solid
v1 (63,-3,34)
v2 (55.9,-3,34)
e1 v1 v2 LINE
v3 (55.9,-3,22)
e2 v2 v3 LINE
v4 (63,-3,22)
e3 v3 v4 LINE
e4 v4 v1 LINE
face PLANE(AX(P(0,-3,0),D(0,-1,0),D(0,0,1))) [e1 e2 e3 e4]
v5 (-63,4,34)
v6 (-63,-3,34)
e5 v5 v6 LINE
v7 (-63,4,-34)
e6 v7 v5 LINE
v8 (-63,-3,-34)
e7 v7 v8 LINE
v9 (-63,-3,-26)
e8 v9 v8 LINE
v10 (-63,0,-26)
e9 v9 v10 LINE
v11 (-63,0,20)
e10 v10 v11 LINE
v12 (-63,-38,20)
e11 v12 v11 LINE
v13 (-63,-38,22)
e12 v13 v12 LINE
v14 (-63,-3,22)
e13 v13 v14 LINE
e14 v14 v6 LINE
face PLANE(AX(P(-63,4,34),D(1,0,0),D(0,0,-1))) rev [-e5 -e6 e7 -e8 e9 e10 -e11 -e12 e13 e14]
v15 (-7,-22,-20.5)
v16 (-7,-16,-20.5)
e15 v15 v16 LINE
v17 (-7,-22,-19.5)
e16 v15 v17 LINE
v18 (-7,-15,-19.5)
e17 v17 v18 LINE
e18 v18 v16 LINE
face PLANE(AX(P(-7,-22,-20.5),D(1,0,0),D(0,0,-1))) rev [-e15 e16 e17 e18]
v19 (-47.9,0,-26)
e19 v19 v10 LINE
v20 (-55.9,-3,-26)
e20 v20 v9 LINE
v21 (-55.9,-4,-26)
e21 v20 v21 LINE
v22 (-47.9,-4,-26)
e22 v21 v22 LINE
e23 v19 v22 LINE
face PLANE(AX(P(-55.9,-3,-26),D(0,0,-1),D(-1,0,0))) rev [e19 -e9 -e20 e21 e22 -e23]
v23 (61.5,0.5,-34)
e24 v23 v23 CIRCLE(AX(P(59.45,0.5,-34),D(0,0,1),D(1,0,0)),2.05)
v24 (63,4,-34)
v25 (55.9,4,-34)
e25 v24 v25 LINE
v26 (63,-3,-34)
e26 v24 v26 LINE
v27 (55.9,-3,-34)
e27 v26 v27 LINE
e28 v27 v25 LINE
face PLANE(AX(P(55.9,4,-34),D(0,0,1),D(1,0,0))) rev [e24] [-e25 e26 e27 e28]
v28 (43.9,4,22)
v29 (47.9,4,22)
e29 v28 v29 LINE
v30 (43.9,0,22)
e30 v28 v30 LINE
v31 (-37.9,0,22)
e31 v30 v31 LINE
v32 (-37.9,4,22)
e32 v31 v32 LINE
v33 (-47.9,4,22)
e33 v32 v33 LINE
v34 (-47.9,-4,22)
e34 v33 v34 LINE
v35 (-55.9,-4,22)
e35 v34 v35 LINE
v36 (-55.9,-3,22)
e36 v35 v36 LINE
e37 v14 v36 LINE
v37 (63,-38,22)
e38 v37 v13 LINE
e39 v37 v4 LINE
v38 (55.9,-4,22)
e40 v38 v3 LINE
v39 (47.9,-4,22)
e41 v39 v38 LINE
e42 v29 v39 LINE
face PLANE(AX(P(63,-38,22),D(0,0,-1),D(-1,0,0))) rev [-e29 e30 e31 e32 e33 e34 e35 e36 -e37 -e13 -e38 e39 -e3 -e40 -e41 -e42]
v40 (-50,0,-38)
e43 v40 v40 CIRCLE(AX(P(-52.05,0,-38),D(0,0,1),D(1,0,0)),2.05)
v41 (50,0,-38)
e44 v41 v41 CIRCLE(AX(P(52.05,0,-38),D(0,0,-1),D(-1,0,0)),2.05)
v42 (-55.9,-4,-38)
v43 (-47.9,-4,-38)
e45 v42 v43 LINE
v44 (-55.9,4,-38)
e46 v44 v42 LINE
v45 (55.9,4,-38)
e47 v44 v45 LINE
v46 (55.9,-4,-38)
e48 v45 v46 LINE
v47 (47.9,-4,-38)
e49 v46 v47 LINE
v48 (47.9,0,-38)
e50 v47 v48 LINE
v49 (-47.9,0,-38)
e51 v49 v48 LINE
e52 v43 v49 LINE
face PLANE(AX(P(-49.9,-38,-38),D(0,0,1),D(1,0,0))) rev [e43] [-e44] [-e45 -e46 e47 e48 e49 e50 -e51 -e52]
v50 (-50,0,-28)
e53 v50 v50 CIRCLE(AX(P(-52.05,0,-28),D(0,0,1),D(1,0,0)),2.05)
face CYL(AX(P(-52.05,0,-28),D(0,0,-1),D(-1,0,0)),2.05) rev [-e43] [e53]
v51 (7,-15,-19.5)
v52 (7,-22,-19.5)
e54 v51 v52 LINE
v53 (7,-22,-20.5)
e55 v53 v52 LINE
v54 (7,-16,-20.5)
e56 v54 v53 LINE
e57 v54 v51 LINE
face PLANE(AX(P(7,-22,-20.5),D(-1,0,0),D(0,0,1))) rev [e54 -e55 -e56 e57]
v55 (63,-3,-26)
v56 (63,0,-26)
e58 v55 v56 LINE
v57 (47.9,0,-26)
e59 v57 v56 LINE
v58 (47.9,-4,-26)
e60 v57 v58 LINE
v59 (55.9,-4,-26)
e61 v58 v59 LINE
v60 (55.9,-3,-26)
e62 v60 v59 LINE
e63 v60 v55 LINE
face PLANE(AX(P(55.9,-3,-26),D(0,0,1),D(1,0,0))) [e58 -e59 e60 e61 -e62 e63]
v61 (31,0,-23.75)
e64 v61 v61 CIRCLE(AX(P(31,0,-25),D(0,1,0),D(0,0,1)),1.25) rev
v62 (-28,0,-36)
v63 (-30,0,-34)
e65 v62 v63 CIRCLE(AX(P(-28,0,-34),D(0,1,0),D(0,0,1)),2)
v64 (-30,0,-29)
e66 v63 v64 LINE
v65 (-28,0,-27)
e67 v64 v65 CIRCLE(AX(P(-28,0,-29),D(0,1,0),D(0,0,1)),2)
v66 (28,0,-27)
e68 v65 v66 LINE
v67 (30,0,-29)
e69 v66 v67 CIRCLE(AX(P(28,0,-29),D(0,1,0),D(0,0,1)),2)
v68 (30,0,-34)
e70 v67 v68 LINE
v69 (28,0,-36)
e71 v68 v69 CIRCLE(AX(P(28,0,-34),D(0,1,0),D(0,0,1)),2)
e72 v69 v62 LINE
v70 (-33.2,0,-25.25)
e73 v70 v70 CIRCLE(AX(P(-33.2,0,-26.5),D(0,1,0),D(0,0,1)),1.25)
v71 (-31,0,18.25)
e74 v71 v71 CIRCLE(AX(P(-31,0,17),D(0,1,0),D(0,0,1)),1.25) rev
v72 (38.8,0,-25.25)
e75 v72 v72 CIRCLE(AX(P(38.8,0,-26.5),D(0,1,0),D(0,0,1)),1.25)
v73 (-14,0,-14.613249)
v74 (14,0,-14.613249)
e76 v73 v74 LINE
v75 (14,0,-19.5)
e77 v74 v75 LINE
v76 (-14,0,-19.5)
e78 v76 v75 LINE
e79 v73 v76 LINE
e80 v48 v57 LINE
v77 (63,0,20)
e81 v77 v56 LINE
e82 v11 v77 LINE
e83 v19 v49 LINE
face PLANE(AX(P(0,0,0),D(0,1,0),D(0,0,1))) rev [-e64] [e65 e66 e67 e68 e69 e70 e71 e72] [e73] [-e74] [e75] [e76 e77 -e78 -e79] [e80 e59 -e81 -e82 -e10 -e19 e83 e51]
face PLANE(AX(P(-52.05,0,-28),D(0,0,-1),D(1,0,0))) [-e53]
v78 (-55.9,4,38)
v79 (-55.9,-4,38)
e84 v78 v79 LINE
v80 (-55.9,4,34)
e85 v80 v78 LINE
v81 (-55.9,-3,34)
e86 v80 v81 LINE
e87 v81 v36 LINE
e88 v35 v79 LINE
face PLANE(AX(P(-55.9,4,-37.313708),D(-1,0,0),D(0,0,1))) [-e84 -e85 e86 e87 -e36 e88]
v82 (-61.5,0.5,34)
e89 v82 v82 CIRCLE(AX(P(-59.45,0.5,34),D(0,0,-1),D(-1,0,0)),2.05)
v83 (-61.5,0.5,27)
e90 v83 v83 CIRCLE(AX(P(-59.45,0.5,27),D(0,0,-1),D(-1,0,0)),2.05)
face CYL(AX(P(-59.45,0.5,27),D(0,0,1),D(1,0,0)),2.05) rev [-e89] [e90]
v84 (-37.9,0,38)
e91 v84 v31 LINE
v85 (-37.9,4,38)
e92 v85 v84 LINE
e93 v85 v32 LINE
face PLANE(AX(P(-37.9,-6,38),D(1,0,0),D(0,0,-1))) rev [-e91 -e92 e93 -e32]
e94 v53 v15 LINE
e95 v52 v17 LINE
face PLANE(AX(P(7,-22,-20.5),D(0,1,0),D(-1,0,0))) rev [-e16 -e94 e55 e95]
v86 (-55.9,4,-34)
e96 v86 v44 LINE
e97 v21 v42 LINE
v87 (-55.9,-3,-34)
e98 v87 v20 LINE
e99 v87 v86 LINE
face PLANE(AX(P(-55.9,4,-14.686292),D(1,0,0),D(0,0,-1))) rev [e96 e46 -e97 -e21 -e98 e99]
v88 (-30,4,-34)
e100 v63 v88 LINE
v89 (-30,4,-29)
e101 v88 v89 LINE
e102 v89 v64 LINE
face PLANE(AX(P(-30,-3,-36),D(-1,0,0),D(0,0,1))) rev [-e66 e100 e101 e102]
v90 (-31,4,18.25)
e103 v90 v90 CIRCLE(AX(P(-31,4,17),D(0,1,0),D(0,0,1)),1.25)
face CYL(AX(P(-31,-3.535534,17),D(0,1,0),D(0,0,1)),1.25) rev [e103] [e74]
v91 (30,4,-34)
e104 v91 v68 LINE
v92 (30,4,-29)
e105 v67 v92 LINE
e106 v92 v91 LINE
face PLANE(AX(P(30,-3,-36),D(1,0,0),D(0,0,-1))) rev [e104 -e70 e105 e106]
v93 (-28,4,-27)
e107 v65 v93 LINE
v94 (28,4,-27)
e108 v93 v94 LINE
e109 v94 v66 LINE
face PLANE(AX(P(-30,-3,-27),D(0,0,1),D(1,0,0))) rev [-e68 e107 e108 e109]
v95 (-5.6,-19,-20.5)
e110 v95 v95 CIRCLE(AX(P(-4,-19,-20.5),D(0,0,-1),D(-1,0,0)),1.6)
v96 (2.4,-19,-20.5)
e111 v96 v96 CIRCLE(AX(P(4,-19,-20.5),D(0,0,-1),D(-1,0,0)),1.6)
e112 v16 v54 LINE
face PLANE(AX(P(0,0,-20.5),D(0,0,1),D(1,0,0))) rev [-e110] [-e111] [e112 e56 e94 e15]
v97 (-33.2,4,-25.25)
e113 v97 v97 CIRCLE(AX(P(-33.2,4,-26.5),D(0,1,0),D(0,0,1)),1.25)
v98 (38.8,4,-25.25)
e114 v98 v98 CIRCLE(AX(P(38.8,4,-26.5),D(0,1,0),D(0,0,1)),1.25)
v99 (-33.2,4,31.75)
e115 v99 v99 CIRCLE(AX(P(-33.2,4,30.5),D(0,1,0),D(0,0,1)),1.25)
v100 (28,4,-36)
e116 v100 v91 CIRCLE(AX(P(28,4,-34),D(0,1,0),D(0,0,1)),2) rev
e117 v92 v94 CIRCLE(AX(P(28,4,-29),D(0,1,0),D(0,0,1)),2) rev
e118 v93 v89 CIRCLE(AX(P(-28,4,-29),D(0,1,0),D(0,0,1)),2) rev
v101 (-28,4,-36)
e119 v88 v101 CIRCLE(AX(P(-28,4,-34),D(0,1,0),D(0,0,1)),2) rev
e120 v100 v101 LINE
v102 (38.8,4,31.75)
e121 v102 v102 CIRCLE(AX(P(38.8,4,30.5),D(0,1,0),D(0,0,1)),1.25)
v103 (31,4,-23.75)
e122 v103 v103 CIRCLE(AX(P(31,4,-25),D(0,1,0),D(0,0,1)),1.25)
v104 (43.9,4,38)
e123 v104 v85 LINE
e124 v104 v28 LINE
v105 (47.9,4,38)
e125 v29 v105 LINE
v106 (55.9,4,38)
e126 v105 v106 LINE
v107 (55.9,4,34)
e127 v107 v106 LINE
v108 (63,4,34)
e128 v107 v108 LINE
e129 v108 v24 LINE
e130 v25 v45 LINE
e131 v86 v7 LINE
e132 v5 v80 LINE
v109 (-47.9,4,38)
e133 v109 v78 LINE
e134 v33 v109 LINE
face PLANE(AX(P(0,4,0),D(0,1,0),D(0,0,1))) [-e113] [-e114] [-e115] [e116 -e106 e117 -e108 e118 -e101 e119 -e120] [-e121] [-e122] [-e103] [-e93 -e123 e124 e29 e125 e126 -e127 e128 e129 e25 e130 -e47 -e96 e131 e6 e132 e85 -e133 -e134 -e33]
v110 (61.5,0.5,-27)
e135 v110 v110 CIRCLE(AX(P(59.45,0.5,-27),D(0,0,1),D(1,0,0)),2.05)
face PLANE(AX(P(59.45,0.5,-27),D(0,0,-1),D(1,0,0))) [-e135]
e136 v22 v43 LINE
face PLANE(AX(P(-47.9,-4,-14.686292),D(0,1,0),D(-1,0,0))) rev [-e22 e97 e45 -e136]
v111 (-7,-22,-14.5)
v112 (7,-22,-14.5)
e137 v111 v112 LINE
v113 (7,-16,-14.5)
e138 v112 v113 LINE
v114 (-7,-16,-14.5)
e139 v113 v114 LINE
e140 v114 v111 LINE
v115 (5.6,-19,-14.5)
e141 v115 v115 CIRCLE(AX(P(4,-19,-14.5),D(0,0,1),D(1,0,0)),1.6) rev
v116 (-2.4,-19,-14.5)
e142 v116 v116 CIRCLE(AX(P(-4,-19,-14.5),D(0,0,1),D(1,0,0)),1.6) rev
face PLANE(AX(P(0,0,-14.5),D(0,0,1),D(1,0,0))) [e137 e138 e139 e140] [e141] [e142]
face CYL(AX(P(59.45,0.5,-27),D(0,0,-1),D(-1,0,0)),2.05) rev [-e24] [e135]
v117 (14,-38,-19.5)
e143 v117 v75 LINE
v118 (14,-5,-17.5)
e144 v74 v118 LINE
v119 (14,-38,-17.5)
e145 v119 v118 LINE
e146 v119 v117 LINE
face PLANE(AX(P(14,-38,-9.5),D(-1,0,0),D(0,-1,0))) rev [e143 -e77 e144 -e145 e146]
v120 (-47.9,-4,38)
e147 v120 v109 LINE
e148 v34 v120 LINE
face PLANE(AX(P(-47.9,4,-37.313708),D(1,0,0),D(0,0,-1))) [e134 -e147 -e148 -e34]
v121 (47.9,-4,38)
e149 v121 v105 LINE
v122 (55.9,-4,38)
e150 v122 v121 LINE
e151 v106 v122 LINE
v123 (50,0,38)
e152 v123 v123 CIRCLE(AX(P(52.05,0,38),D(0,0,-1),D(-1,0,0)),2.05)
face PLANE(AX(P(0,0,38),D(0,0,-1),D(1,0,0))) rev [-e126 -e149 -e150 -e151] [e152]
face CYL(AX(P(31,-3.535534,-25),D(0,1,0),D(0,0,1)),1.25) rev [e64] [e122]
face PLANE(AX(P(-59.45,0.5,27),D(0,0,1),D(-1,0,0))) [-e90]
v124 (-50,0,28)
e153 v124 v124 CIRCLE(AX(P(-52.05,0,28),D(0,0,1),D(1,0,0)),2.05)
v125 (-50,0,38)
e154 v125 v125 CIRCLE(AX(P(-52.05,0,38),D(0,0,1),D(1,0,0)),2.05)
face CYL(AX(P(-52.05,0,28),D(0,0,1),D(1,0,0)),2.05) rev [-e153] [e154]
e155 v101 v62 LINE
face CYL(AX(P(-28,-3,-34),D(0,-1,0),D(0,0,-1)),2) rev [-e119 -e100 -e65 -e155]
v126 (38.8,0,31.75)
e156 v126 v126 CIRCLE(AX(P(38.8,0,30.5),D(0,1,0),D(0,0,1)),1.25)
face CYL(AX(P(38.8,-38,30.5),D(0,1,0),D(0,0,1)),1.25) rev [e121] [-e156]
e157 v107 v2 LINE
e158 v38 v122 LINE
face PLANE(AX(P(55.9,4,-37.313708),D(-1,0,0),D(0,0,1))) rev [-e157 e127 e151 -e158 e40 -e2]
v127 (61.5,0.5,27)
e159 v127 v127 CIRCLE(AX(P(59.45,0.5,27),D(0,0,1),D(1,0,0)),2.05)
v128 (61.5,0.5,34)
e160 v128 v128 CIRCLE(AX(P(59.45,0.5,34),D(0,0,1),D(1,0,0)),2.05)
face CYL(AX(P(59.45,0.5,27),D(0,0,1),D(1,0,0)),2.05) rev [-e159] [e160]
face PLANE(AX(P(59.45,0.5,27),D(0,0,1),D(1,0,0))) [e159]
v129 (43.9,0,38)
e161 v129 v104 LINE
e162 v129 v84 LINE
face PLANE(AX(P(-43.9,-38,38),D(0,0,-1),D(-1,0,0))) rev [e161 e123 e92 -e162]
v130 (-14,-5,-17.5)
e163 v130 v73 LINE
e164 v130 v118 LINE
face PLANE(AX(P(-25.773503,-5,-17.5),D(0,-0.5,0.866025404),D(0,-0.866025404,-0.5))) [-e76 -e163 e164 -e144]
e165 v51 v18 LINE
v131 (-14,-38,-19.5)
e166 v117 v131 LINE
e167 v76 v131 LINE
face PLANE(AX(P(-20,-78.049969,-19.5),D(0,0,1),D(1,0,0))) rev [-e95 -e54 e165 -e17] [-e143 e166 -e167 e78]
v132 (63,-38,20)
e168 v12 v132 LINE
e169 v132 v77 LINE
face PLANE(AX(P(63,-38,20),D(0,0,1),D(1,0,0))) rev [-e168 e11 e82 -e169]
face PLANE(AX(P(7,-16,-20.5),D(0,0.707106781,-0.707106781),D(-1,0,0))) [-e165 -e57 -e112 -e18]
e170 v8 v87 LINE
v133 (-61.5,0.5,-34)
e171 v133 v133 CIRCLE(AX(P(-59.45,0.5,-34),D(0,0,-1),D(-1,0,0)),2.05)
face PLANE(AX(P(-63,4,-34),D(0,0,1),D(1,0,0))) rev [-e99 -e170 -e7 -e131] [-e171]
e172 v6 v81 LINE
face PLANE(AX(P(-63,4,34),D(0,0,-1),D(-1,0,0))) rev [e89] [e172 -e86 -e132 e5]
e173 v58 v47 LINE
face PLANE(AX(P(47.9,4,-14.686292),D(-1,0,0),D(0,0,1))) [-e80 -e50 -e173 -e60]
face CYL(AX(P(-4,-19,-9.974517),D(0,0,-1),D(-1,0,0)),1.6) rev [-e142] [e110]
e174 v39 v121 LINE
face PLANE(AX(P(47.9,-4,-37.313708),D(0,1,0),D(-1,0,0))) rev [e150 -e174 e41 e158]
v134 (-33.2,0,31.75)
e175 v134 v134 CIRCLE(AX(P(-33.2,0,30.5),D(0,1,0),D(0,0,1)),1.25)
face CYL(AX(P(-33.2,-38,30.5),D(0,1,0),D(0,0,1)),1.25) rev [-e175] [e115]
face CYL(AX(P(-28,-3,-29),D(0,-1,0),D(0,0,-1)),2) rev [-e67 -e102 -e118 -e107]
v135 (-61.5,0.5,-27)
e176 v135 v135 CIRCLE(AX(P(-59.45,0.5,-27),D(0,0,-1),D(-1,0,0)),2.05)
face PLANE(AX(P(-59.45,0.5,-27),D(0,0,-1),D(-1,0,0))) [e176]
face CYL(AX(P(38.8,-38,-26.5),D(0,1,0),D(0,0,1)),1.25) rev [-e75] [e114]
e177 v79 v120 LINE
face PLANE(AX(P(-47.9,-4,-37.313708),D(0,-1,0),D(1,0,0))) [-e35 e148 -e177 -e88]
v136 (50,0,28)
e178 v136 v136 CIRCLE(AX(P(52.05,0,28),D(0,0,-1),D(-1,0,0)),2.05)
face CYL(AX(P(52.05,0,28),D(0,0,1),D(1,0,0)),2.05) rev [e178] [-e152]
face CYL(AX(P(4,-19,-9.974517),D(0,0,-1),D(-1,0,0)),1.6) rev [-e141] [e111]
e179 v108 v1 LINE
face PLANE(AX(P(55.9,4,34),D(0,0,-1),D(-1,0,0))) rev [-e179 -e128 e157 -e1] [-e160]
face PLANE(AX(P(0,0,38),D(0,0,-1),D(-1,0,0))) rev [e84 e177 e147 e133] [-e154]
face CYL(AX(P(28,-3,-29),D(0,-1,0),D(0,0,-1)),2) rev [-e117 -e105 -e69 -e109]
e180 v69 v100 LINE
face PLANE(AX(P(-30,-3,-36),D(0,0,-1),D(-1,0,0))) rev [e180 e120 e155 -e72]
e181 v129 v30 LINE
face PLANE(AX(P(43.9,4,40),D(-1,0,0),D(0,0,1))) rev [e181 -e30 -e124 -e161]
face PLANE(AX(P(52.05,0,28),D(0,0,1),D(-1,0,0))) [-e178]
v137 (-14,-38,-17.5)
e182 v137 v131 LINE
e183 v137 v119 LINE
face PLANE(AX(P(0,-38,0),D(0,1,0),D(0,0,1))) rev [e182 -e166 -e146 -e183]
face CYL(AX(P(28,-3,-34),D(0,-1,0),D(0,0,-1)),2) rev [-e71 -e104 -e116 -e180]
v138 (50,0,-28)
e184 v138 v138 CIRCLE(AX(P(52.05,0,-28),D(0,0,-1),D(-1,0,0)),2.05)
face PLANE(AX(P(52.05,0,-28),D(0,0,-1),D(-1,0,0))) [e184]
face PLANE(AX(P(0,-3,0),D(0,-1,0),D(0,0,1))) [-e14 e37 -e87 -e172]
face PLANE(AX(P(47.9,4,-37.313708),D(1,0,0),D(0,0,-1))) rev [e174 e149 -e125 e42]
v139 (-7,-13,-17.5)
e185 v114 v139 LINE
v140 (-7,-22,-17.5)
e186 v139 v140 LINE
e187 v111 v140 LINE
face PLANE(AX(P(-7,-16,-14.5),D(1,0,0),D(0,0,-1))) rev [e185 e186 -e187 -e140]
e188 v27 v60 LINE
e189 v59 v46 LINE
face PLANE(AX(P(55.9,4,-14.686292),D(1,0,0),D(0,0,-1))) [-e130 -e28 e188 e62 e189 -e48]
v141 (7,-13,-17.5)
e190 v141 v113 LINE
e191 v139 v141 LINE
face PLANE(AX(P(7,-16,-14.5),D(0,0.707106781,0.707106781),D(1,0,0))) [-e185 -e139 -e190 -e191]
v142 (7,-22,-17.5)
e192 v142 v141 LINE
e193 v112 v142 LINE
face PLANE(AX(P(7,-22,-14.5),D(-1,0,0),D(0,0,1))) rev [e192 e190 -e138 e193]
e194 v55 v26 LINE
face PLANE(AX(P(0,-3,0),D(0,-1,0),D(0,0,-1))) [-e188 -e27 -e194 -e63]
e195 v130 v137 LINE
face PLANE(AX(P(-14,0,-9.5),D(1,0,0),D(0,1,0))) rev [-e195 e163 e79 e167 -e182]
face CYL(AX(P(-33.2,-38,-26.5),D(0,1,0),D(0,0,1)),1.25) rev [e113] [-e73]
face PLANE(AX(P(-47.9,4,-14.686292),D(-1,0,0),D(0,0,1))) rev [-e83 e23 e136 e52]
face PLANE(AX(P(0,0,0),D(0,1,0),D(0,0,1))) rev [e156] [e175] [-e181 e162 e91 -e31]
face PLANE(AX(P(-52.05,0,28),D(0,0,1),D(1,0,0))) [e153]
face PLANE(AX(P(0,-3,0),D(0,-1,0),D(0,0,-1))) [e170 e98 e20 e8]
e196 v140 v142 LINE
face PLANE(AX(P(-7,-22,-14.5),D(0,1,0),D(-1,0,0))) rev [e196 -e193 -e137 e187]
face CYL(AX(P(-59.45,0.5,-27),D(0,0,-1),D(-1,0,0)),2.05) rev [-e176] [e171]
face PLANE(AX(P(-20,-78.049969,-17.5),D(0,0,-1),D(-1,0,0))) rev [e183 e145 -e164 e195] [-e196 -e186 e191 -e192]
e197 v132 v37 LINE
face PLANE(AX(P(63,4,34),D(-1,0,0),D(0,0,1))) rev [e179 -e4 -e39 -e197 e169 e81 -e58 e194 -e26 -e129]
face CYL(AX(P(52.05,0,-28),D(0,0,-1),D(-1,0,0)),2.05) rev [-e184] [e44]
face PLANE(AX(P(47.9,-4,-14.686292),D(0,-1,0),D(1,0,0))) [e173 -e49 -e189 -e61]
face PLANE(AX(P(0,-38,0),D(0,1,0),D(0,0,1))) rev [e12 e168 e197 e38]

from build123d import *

# Parameters (mm, degrees)
BOSS_EXTRUDE1_DEPTH             = 4
SKETCH3_W                       = 7.1
SKETCH3_H                       = 8
BOSS_EXTRUDE3_DEPTH             = 3
SKETCH4_R                       = 2.05
CUT_EXTRUDE1_DEPTH              = 7
MIRROR2_COPY_1_SKETCH_W         = 7.1
MIRROR2_COPY_1_SKETCH_H         = 8
MIRROR2_COPY_1_DEPTH            = 3
MIRROR2_COPY_2_SKETCH_R         = 2.05
MIRROR2_COPY_2_DEPTH            = 7
SKETCH5_W                       = 60
SKETCH5_H                       = 9
CUT_EXTRUDE2_DEPTH              = 76.4917214
FILLET1_R                       = 2
SKETCH7_W                       = 111.8
SKETCH7_H                       = 1
CUT_EXTRUDE3_DEPTH              = 76.4917214
SKETCH8_W                       = 126
SKETCH8_H                       = 2
BOSS_EXTRUDE4_DEPTH             = 38
SKETCH9_W                       = 12
SKETCH9_H                       = 18
CUT_EXTRUDE4_DEPTH              = 10
SKETCH10_W                      = 7.1
SKETCH10_H                      = 4
BOSS_EXTRUDE5_DEPTH             = 3
SKETCH12_W                      = 1.5
SKETCH12_H                      = 4
BOSS_EXTRUDE6_DEPTH             = 2
SKETCH13_W                      = 40
SKETCH13_H                      = 2
BOSS_EXTRUDE7_DEPTH             = 38
SKETCH14_W                      = 1.5
SKETCH14_H                      = 4
BOSS_EXTRUDE8_DEPTH             = 1
BOSS_EXTRUDE9_REACH             = 85.744
BOSS_EXTRUDE9_DIRECTION_2_REACH = 85.744
SKETCH16_W                      = 20
SKETCH16_H                      = 14
SKETCH16_W_2                    = 14.5
SKETCH16_H_2                    = 9
BOSS_EXTRUDE10_DEPTH            = 4
SKETCH17_W                      = 12
SKETCH17_H                      = 18
CUT_EXTRUDE5_DEPTH              = 84.743656476
SKETCH18_W                      = 6
SKETCH18_H                      = 6
CUT_EXTRUDE6_DEPTH              = 86.632937588
SKETCH22_R                      = 1.25
CUT_EXTRUDE7_DEPTH              = 4
SKETCH25_W                      = 6
SKETCH25_H                      = 38
CUT_EXTRUDE11_DEPTH             = 10
CUT_EXTRUDE12_DEPTH             = 85.498520697
CUT_EXTRUDE12_DEPTH_BACK        = 85.498520697
SKETCH26_W                      = 7.701552738
SKETCH26_H                      = 30.562488548
SKETCH26_W_2                    = 6.53419365
SKETCH26_H_2                    = 28.524331859
SKETCH27_R                      = 1.25
CUT_EXTRUDE13_DEPTH             = 86.632937588
SKETCH28_W                      = 99.8
SKETCH28_H                      = 0.6
SKETCH28_W_2                    = 87.8
CUT_EXTRUDE14_DEPTH             = 86.632937588
SKETCH29_W                      = 87.8
SKETCH29_H                      = 1.4
CUT_EXTRUDE15_DEPTH             = 86.354320336
SKETCH30_W                      = 99.8
SKETCH30_H                      = 1.4
CUT_EXTRUDE16_DEPTH             = 86.354320336
SKETCH31_W                      = 2
SKETCH31_H                      = 4
CUT_EXTRUDE17_DEPTH             = 85.717176535
BOSS_EXTRUDE11_START            = -12
SKETCH32_W                      = 8
SKETCH32_H                      = 8
BOSS_EXTRUDE11_DEPTH            = 12
SKETCH33_R                      = 2.05
CUT_EXTRUDE18_DEPTH             = 10
MIRROR5_START                   = -26
MIRROR5_OUTLINE_W               = 8
MIRROR5_OUTLINE_H               = 8
MIRROR5_OUTLINE_R               = 2.05
MIRROR5_DEPTH                   = 64
MIRROR5_2_OUTLINE_R             = 2.05
MIRROR5_2_DEPTH                 = 54
SKETCH34_W                      = 6
SKETCH34_H                      = 16
CUT_EXTRUDE19_DEPTH             = 10
SKETCH35_W                      = 8
SKETCH35_H                      = 46
CUT_EXTRUDE20_DEPTH             = 4
SKETCH36_W                      = 14
SKETCH36_H                      = 6
BOSS_EXTRUDE12_DEPTH            = 1
SKETCH38_W                      = 14
SKETCH38_H                      = 6
BOSS_EXTRUDE13_DEPTH            = 3
CHAMFER1_SIZE                   = 1
SKETCH37_R                      = 1.6
CUT_EXTRUDE21_DEPTH             = 6
CHAMFER2_SIZE                   = 3
SKETCH39_W                      = 20
SKETCH39_H                      = 14
CUT_EXTRUDE22_DEPTH             = 16


# Read off the part's stored shape, not the designer's step: Mirror5
with BuildPart() as part:
    # Sketch1 → Boss-Extrude1 (new body)
    with BuildSketch(Plane(origin=(0, 0, 0), x_dir=(1, 0, 0), z_dir=(0, 1, 0))):
        Polygon((-63, -34), (-55.9, -34), (-55.9, -41), (55.9, -41), (55.9, -34), (63, -34), (63, 34), (55.9, 34), (55.9, 41), (-55.9, 41), (-55.9, 34), (-63, 34), align=None)
    extrude(amount=BOSS_EXTRUDE1_DEPTH)

    # Sketch3 → Boss-Extrude3 (add)
    with BuildSketch(Plane.XZ):
        with Locations((-59.45, -30)):
            Rectangle(SKETCH3_W, SKETCH3_H)
    boss_extrude3 = extrude(amount=BOSS_EXTRUDE3_DEPTH)

    # Sketch4 → Cut-Extrude1 (cut)
    with BuildSketch(Plane(origin=(0, 0, -34), x_dir=(-1, 0, 0), z_dir=(0, 0, -1))):
        with Locations((59.45, 0.5)):
            Circle(SKETCH4_R)
    cut_extrude1 = extrude(amount=-CUT_EXTRUDE1_DEPTH, mode=Mode.SUBTRACT)

    # Mirror1: Boss-Extrude3, Cut-Extrude1 across plane
    add(boss_extrude3.mirror(Plane(origin=(0, 0, 0), x_dir=(0, 0, 1), z_dir=(1, 0, 0))))
    add(cut_extrude1.mirror(Plane(origin=(0, 0, 0), x_dir=(0, 0, 1), z_dir=(1, 0, 0))), mode=Mode.SUBTRACT)

    # Mirror2: Boss-Extrude3, Cut-Extrude1 across plane
    add(boss_extrude3.mirror(Plane.XY))
    add(cut_extrude1.mirror(Plane.XY), mode=Mode.SUBTRACT)

    # Mirror2 copy 1 sketch → Mirror2 copy 1 (add)
    with BuildSketch(Plane(origin=(0, 0, 0), x_dir=(-1, 0, 0), z_dir=(0, -1, 0))):
        with Locations((-59.45, -30)):
            Rectangle(MIRROR2_COPY_1_SKETCH_W, MIRROR2_COPY_1_SKETCH_H)
    extrude(amount=MIRROR2_COPY_1_DEPTH)

    # Mirror2 copy 2 sketch → Mirror2 copy 2 (cut)
    with BuildSketch(Plane.XY.offset(34)):
        with Locations((59.45, 0.5)):
            Circle(MIRROR2_COPY_2_SKETCH_R)
    extrude(amount=-MIRROR2_COPY_2_DEPTH, mode=Mode.SUBTRACT)

    # Sketch5 → Cut-Extrude2 (cut, through all)
    with BuildSketch(Plane(origin=(0, 4, 0), x_dir=(1, 0, 0), z_dir=(0, 1, 0))):
        with Locations((0, 31.5)):
            Rectangle(SKETCH5_W, SKETCH5_H)
    extrude(amount=-CUT_EXTRUDE2_DEPTH, mode=Mode.SUBTRACT)

    # Fillet1
    fillet1_edges = [part.edges().sort_by_distance(p)[0] for p in [
        (-30, 2, -27),
        (-30, 2, -36),
        (30, 2, -36),
        (30, 2, -27),
    ]]
    fillet(fillet1_edges, radius=FILLET1_R)

    # Sketch7 → Cut-Extrude3 (cut, through all)
    with BuildSketch(Plane(origin=(0, 4, 0), x_dir=(1, 0, 0), z_dir=(0, 1, 0))):
        with Locations((0, 40.5)):
            Rectangle(SKETCH7_W, SKETCH7_H)
        with Locations((0, -40.5)):
            Rectangle(SKETCH7_W, SKETCH7_H)
    extrude(amount=-CUT_EXTRUDE3_DEPTH, mode=Mode.SUBTRACT)

    # Sketch8 → Boss-Extrude4 (add)
    with BuildSketch(Plane.XZ):
        with Locations((0, 21)):
            Rectangle(SKETCH8_W, SKETCH8_H)
    extrude(amount=BOSS_EXTRUDE4_DEPTH)

    # Sketch9 → Cut-Extrude4 (cut)
    with BuildSketch(Plane(origin=(0, 4, 0), x_dir=(1, 0, 0), z_dir=(0, 1, 0))):
        with Locations((-49.9, -31)):
            Rectangle(SKETCH9_W, SKETCH9_H)
    extrude(amount=-CUT_EXTRUDE4_DEPTH, mode=Mode.SUBTRACT)

    # Sketch10 → Boss-Extrude5 (add)
    with BuildSketch(Plane.XZ.offset(3)):
        with Locations((-59.45, 24)):
            Rectangle(SKETCH10_W, SKETCH10_H)
        with Locations((59.45, 24)):
            Rectangle(SKETCH10_W, SKETCH10_H)
    extrude(amount=-BOSS_EXTRUDE5_DEPTH)

    # Sketch12 → Boss-Extrude6 (add)
    # profile 1 of 2: a face of its own
    with BuildSketch(Plane.ZY.offset(56)):
        Polygon((22, -5.8), (22, -16.2), (24.7, -13.5), (24.7, -8.5), align=None)
        with Locations((23.35, -11)):
            Rectangle(SKETCH12_W, SKETCH12_H, mode=Mode.SUBTRACT)
    # profile 2 of 2: a face of its own
    with BuildSketch(Plane.ZY.offset(56)):
        Polygon((22, -20.8), (22, -31.2), (24.7, -28.5), (24.7, -23.5), align=None)
        with Locations((23.35, -26)):
            Rectangle(SKETCH12_W, SKETCH12_H, mode=Mode.SUBTRACT)
    boss_extrude6 = extrude(amount=-BOSS_EXTRUDE6_DEPTH)

    # Mirror3: Boss-Extrude6 across plane
    add(boss_extrude6.mirror(Plane(origin=(-49.9, 0, 0), x_dir=(0, 0, 1), z_dir=(1, 0, 0))))

    # Sketch13 → Boss-Extrude7 (add)
    with BuildSketch(Plane.XZ):
        with Locations((0, -18.5)):
            Rectangle(SKETCH13_W, SKETCH13_H)
    extrude(amount=BOSS_EXTRUDE7_DEPTH)

    # Sketch14 → Boss-Extrude8 (add, symmetric)
    # profile 1 of 2: a face of its own
    with BuildSketch(Plane(origin=(0, 0, 0), x_dir=(0, 0, -1), z_dir=(1, 0, 0))):
        Polygon((22.2, -8.5), (19.5, -5.8), (19.5, -16.2), (22.2, -13.5), align=None)
        with Locations((20.85, -11)):
            Rectangle(SKETCH14_W, SKETCH14_H, mode=Mode.SUBTRACT)
    # profile 2 of 2: a face of its own
    with BuildSketch(Plane(origin=(0, 0, 0), x_dir=(0, 0, -1), z_dir=(1, 0, 0))):
        Polygon((22.2, -28.5), (22.2, -23.5), (19.5, -20.8), (19.5, -31.2), align=None)
        with Locations((20.85, -26)):
            Rectangle(SKETCH14_W, SKETCH14_H, mode=Mode.SUBTRACT)
    extrude(amount=BOSS_EXTRUDE8_DEPTH, both=True)

    # Boss-Extrude9: up to this face of the body (flat: up to its plane)
    boss_extrude9_end = Plane(part.part.faces().sort_by_distance((-20, -19, -18.5))[0])
    # Sketch15 → Boss-Extrude9 (add, up to the picked face)
    with BuildSketch(Plane(origin=(0, 0, 0), x_dir=(0, 0, -1), z_dir=(1, 0, 0)), mode=Mode.PRIVATE) as boss_extrude9_sk1:
        Polygon((17.5, 0), (17.5, -5), (14.613248654, 0), align=None)
    boss_extrude9_tool1 = split(extrude(boss_extrude9_sk1.sketch, amount=-BOSS_EXTRUDE9_REACH, mode=Mode.PRIVATE), bisect_by=boss_extrude9_end, keep=Keep.BOTH, mode=Mode.PRIVATE)
    add(boss_extrude9_tool1.solids().sort_by(Axis((0, -1.666667, -16.53775), (-1, 0, 0)))[0])

    # Boss-Extrude9 direction 2: up to this face of the body (flat: up to its plane)
    boss_extrude9_direction_2_end = Plane(part.part.faces().sort_by_distance((20, -19, -18.5))[0])
    # Sketch15 → Boss-Extrude9 direction 2 (add, up to the picked face)
    with BuildSketch(Plane(origin=(0, 0, 0), x_dir=(0, 0, -1), z_dir=(1, 0, 0)), mode=Mode.PRIVATE) as boss_extrude9_direction_2_sk1:
        Polygon((17.5, 0), (17.5, -5), (14.613248654, 0), align=None)
    boss_extrude9_direction_2_tool1 = split(extrude(boss_extrude9_direction_2_sk1.sketch, amount=BOSS_EXTRUDE9_DIRECTION_2_REACH, mode=Mode.PRIVATE), bisect_by=boss_extrude9_direction_2_end, keep=Keep.BOTH, mode=Mode.PRIVATE)
    add(boss_extrude9_direction_2_tool1.solids().sort_by(Axis((0, -1.666667, -16.53775), (1, 0, 0)))[0])

    # Sketch16 → Boss-Extrude10 (add)
    with BuildSketch(Plane.XY.offset(40)):
        with Locations((30, -7)):
            Rectangle(SKETCH16_W, SKETCH16_H)
        with Locations((30, -7)):
            Rectangle(SKETCH16_W_2, SKETCH16_H_2, mode=Mode.SUBTRACT)
    extrude(amount=-BOSS_EXTRUDE10_DEPTH)

    # Sketch17 → Cut-Extrude5 (cut, through all)
    with BuildSketch(Plane.XZ):
        with Locations((49.9, 31)):
            Rectangle(SKETCH17_W, SKETCH17_H)
    extrude(amount=-CUT_EXTRUDE5_DEPTH, mode=Mode.SUBTRACT)

    # Sketch18 → Cut-Extrude6 (cut, through all)
    with BuildSketch(Plane(origin=(0, 4, 0), x_dir=(1, 0, 0), z_dir=(0, 1, 0))):
        with Locations((52.9, 37)):
            Rectangle(SKETCH18_W, SKETCH18_H)
        with Locations((-52.9, 37)):
            Rectangle(SKETCH18_W, SKETCH18_H)
    extrude(amount=-CUT_EXTRUDE6_DEPTH, mode=Mode.SUBTRACT)

    # Sketch22 → Cut-Extrude7 (cut)
    with BuildSketch(Plane(origin=(0, 4, 0), x_dir=(1, 0, 0), z_dir=(0, 1, 0))):
        with Locations(Location((31, 25, 0), (0, 0, 270))):
            Circle(SKETCH22_R)
        with Locations(Location((-31, -17, 0), (0, 0, 270))):
            Circle(SKETCH22_R)
    extrude(amount=-CUT_EXTRUDE7_DEPTH, mode=Mode.SUBTRACT)

    # Sketch25 → Cut-Extrude11 (cut)
    with BuildSketch(Plane(origin=(0, 0, -19.5), x_dir=(-1, 0, 0), z_dir=(0, 0, -1))):
        with Locations((-17, -19)):
            Rectangle(SKETCH25_W, SKETCH25_H)
        with Locations((17, -19)):
            Rectangle(SKETCH25_W, SKETCH25_H)
    extrude(amount=-CUT_EXTRUDE11_DEPTH, mode=Mode.SUBTRACT)

    # Sketch26 → Cut-Extrude12 (cut, two sides: drawn at the far end of the back side and taken through both)
    with BuildSketch(Plane.ZY.offset(1).offset(-CUT_EXTRUDE12_DEPTH_BACK)):
        with Locations((-23.350776369, -21.081244274)):
            Rectangle(SKETCH26_W, SKETCH26_H)
        with Locations((25.267096825, -20.06216593)):
            Rectangle(SKETCH26_W_2, SKETCH26_H_2)
    extrude(amount=CUT_EXTRUDE12_DEPTH + CUT_EXTRUDE12_DEPTH_BACK, mode=Mode.SUBTRACT)

    # Sketch27 → Cut-Extrude13 (cut, through all)
    with BuildSketch(Plane(origin=(0, 4, 0), x_dir=(1, 0, 0), z_dir=(0, 1, 0))):
        with Locations(Location((-33.2, 26.5, 0), (0, 0, 270))):
            Circle(SKETCH27_R)
        with Locations(Location((-33.2, -30.5, 0), (0, 0, 270))):
            Circle(SKETCH27_R)
        with Locations(Location((38.8, -30.5, 0), (0, 0, 270))):
            Circle(SKETCH27_R)
        with Locations(Location((38.8, 26.5, 0), (0, 0, 270))):
            Circle(SKETCH27_R)
    extrude(amount=-CUT_EXTRUDE13_DEPTH, mode=Mode.SUBTRACT)

    # Sketch28 → Cut-Extrude14 (cut, through all)
    with BuildSketch(Plane(origin=(0, 4, 0), x_dir=(1, 0, 0), z_dir=(0, 1, 0))):
        with Locations((0, 39.7)):
            Rectangle(SKETCH28_W, SKETCH28_H)
        with Locations((0, -39.7)):
            Rectangle(SKETCH28_W_2, SKETCH28_H)
    extrude(amount=-CUT_EXTRUDE14_DEPTH, mode=Mode.SUBTRACT)

    # Sketch29 → Cut-Extrude15 (cut, through all)
    with BuildSketch(Plane(origin=(0, 4, 0), x_dir=(1, 0, 0), z_dir=(0, 1, 0))):
        with Locations((0, -38.7)):
            Rectangle(SKETCH29_W, SKETCH29_H)
    extrude(amount=-CUT_EXTRUDE15_DEPTH, mode=Mode.SUBTRACT)

    # Sketch30 → Cut-Extrude16 (cut, through all)
    with BuildSketch(Plane(origin=(0, 4, 0), x_dir=(1, 0, 0), z_dir=(0, 1, 0))):
        with Locations((0, 38.7)):
            Rectangle(SKETCH30_W, SKETCH30_H)
    extrude(amount=-CUT_EXTRUDE16_DEPTH, mode=Mode.SUBTRACT)

    # Sketch31 → Cut-Extrude17 (cut, through all)
    with BuildSketch(Plane(origin=(0, 4, 0), x_dir=(1, 0, 0), z_dir=(0, 1, 0))):
        with Locations((-48.9, 36)):
            Rectangle(SKETCH31_W, SKETCH31_H)
        with Locations((48.9, 36)):
            Rectangle(SKETCH31_W, SKETCH31_H)
    extrude(amount=-CUT_EXTRUDE17_DEPTH, mode=Mode.SUBTRACT)

    # Sketch32 → Boss-Extrude11 (add)
    with BuildSketch(Plane(origin=(0, 0, -38), x_dir=(-1, 0, 0), z_dir=(0, 0, -1)).offset(BOSS_EXTRUDE11_START)):
        with Locations((-51.9, 0)):
            Rectangle(SKETCH32_W, SKETCH32_H)
    boss_extrude11 = extrude(amount=BOSS_EXTRUDE11_DEPTH)

    # Sketch33 → Cut-Extrude18 (cut)
    with BuildSketch(Plane(origin=(0, 0, -38), x_dir=(-1, 0, 0), z_dir=(0, 0, -1))):
        with Locations((-52.05, 0)):
            Circle(SKETCH33_R)
    cut_extrude18 = extrude(amount=-CUT_EXTRUDE18_DEPTH, mode=Mode.SUBTRACT)

    # Mirror4: Boss-Extrude11, Cut-Extrude18 across plane
    add(boss_extrude11.mirror(Plane(origin=(0, 0, 0), x_dir=(0, 0, 1), z_dir=(1, 0, 0))))
    add(cut_extrude18.mirror(Plane(origin=(0, 0, 0), x_dir=(0, 0, 1), z_dir=(1, 0, 0))), mode=Mode.SUBTRACT)

    # Mirror5 outline → Mirror5 (add)
    # profile 1 of 2: a face of its own
    with BuildSketch(Plane.XY.offset(MIRROR5_START)):
        with Locations((51.9, 0)):
            Rectangle(MIRROR5_OUTLINE_W, MIRROR5_OUTLINE_H)
        with Locations((52.05, 0)):
            Circle(MIRROR5_OUTLINE_R, mode=Mode.SUBTRACT)
    # profile 2 of 2: a face of its own
    with BuildSketch(Plane.XY.offset(MIRROR5_START)):
        with Locations((-51.9, 0)):
            Rectangle(MIRROR5_OUTLINE_W, MIRROR5_OUTLINE_H)
        with Locations((-52.05, 0)):
            Circle(MIRROR5_OUTLINE_R, mode=Mode.SUBTRACT)
    extrude(amount=MIRROR5_DEPTH)

    # Mirror5 2 outline → Mirror5 2 (add)
    with BuildSketch(Plane.XY.offset(MIRROR5_START)):
        with Locations((52.05, 0)):
            Circle(MIRROR5_2_OUTLINE_R)
        with Locations((-52.05, 0)):
            Circle(MIRROR5_2_OUTLINE_R)
    extrude(amount=MIRROR5_2_DEPTH)

    # Sketch34 → Cut-Extrude19 (cut)
    with BuildSketch(Plane(origin=(0, 4, 0), x_dir=(1, 0, 0), z_dir=(0, 1, 0))):
        with Locations((-40.9, -30)):
            Rectangle(SKETCH34_W, SKETCH34_H)
    extrude(amount=-CUT_EXTRUDE19_DEPTH, mode=Mode.SUBTRACT)

    # Sketch35 → Cut-Extrude20 (cut)
    with BuildSketch(Plane.XZ.offset(4)):
        with Locations((-51.9, -3)):
            Rectangle(SKETCH35_W, SKETCH35_H)
        with Locations((51.9, -3)):
            Rectangle(SKETCH35_W, SKETCH35_H)
    extrude(amount=-CUT_EXTRUDE20_DEPTH, mode=Mode.SUBTRACT)

    # Sketch36 → Boss-Extrude12 (add)
    with BuildSketch(Plane(origin=(0, 0, -19.5), x_dir=(-1, 0, 0), z_dir=(0, 0, -1))):
        with Locations((0, -19)):
            Rectangle(SKETCH36_W, SKETCH36_H)
    extrude(amount=BOSS_EXTRUDE12_DEPTH)

    # Sketch38 → Boss-Extrude13 (add)
    with BuildSketch(Plane.XY.offset(-17.5)):
        with Locations((0, -19)):
            Rectangle(SKETCH38_W, SKETCH38_H)
    extrude(amount=BOSS_EXTRUDE13_DEPTH)

    # Chamfer1
    chamfer1_edges = [part.edges().sort_by_distance(p)[0] for p in [
        (0, -16, -19.5),
    ]]
    chamfer(chamfer1_edges, length=CHAMFER1_SIZE - 0.0001)  # a hair under: the kernel refuses the full size

    # Sketch37 → Cut-Extrude21 (cut)
    with BuildSketch(Plane(origin=(0, 0, -20.5), x_dir=(-1, 0, 0), z_dir=(0, 0, -1))):
        with Locations((-4, -19)):
            Circle(SKETCH37_R)
        with Locations((4, -19)):
            Circle(SKETCH37_R)
    extrude(amount=-CUT_EXTRUDE21_DEPTH, mode=Mode.SUBTRACT)

    # Chamfer2
    chamfer2_edges = [part.edges().sort_by_distance(p)[0] for p in [
        (0, -16, -17.5),
    ]]
    chamfer(chamfer2_edges, length=CHAMFER2_SIZE - 0.0001)  # a hair under: the kernel refuses the full size

    # Sketch39 → Cut-Extrude22 (cut)
    with BuildSketch(Plane.XY.offset(38)):
        with Locations((30, -7)):
            Rectangle(SKETCH39_W, SKETCH39_H)
    extrude(amount=-CUT_EXTRUDE22_DEPTH, mode=Mode.SUBTRACT)


solid = part.part
